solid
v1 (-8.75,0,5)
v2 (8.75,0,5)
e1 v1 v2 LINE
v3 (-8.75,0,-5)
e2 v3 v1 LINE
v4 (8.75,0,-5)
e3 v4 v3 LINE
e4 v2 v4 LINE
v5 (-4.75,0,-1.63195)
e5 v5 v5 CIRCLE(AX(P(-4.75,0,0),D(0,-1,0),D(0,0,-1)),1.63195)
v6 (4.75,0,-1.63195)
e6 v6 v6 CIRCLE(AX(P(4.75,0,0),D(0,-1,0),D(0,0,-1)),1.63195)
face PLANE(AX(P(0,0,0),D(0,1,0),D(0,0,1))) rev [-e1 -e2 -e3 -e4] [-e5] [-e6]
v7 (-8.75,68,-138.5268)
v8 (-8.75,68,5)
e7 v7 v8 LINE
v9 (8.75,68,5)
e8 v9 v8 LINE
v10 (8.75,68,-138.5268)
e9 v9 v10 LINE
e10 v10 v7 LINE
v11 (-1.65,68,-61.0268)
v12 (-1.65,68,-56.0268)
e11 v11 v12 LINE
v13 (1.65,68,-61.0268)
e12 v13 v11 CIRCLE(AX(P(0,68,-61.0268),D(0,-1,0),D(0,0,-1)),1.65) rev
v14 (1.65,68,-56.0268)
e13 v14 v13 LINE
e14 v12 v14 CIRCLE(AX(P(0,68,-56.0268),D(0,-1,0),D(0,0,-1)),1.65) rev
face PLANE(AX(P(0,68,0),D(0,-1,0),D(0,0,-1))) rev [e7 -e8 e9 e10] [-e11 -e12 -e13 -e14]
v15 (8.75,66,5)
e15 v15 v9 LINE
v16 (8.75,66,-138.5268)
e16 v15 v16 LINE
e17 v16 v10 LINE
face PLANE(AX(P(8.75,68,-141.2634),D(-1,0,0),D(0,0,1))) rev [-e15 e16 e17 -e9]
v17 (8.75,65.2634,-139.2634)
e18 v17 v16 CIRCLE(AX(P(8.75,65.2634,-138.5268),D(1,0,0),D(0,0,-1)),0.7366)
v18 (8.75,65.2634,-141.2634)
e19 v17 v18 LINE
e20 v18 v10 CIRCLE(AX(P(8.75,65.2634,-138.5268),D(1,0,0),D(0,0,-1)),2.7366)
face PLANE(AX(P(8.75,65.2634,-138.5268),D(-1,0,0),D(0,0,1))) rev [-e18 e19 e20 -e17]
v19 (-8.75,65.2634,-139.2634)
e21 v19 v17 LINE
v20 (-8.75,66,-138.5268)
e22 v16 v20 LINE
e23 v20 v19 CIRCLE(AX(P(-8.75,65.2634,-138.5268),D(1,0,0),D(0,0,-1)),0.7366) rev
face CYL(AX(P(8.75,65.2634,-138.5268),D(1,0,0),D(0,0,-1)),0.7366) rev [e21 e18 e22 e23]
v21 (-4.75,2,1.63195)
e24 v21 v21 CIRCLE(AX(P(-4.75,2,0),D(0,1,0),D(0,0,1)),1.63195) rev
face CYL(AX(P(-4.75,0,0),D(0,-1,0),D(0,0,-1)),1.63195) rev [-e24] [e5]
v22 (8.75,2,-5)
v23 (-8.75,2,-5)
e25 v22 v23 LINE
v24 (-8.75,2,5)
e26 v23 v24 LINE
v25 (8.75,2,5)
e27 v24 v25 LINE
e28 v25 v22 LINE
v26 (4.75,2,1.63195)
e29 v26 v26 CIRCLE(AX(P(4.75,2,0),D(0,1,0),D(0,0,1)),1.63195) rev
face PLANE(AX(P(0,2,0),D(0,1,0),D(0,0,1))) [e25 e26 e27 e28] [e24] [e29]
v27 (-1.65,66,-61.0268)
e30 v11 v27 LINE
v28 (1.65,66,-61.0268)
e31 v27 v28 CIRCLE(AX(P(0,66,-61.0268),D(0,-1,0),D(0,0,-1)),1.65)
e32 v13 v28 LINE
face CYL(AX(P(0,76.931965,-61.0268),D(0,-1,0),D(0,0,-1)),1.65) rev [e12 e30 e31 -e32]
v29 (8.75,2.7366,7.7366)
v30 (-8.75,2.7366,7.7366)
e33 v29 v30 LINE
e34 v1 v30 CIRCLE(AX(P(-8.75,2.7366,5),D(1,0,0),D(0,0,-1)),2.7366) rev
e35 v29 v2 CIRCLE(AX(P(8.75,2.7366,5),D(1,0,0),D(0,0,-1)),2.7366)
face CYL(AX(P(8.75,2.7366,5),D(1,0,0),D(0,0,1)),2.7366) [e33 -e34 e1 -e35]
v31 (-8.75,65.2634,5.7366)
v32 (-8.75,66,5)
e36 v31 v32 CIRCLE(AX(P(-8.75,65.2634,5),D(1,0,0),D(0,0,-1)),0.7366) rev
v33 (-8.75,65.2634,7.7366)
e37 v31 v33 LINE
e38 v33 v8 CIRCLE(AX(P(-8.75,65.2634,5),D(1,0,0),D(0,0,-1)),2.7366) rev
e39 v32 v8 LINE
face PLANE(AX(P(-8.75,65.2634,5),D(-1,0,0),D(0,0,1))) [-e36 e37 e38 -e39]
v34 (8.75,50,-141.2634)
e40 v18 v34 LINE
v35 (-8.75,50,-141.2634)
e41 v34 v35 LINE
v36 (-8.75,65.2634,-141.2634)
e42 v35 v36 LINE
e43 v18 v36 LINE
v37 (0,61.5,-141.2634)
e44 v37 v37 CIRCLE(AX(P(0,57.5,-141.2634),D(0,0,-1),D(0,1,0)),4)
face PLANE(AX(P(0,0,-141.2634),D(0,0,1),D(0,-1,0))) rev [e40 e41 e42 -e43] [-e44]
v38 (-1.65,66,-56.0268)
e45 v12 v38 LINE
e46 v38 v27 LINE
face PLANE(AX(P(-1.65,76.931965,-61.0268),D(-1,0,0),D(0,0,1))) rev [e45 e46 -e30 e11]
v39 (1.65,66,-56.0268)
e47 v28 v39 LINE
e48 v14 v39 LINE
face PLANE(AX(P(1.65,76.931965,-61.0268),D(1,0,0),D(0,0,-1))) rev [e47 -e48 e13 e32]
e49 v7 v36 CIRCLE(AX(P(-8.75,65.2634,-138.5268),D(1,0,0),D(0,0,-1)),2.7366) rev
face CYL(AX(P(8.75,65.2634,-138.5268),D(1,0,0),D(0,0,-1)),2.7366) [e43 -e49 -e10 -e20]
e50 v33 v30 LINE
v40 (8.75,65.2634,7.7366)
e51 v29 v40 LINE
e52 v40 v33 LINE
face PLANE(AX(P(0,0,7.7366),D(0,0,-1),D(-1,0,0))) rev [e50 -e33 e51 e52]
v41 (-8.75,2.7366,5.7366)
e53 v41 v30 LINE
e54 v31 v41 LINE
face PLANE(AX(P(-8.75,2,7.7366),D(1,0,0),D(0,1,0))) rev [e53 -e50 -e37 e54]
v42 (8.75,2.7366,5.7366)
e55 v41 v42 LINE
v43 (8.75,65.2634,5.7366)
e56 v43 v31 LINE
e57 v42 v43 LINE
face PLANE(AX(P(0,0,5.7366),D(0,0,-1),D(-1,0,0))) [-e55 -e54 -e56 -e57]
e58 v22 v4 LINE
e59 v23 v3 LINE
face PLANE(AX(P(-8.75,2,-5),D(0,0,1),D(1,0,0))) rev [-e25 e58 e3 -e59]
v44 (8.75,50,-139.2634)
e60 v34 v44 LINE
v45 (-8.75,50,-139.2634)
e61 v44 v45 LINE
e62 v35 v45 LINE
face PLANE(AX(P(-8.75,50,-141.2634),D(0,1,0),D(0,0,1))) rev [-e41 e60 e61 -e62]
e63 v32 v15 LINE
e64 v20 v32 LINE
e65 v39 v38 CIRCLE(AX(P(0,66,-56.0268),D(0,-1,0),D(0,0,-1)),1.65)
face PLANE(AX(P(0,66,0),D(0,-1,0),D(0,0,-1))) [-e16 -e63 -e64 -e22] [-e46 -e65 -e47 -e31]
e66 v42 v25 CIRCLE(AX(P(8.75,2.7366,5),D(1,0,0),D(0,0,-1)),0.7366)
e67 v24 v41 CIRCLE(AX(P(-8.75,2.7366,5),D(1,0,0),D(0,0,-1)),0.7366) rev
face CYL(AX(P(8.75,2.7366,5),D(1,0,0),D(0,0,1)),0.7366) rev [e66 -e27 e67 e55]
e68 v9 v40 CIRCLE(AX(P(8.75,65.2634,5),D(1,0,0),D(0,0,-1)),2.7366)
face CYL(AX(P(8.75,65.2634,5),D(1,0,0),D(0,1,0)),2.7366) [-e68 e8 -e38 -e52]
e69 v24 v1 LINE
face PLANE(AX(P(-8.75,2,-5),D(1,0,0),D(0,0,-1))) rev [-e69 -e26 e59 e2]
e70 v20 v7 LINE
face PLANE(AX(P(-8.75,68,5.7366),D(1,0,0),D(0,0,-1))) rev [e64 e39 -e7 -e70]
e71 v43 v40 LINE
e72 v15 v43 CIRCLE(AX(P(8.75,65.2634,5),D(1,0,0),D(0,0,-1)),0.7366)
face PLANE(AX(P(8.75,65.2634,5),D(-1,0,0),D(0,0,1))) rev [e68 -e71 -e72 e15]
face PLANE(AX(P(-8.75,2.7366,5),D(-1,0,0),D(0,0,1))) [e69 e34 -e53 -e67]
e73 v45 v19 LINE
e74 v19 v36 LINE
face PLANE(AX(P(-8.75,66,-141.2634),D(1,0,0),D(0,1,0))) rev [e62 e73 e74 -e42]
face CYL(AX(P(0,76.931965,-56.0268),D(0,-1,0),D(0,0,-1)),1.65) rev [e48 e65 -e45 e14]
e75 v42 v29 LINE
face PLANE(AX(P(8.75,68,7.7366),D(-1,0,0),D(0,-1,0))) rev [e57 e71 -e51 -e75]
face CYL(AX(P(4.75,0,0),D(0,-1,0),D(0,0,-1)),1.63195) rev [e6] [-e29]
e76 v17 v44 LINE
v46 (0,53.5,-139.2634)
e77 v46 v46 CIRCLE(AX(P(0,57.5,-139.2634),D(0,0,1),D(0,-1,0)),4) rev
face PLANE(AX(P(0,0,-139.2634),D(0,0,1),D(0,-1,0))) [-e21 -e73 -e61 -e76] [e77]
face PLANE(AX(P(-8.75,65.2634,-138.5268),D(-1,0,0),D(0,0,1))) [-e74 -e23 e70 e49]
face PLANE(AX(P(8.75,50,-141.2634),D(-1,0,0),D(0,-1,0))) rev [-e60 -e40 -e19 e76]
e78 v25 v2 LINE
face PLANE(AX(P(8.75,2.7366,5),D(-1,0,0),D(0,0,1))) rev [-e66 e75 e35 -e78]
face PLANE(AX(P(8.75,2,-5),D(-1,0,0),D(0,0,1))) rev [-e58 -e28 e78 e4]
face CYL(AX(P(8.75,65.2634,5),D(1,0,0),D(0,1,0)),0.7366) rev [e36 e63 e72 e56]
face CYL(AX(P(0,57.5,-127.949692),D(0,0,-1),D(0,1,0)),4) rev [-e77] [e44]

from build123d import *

# Parameters (mm, degrees)
SKETCH1_W                    = 17.5
SKETCH1_H                    = 10
BASE_FLANGE1_DEPTH           = 2
EDGE_FLANGE1_DEPTH           = 17.5
EDGE_FLANGE2_STRIP_W         = 9.4732
EDGE_FLANGE2_STRIP_H         = 2
EDGE_FLANGE2_STRIP_CUT_DEPTH = 17.5
EDGE_FLANGE2_DEPTH           = 17.5
EDGE_FLANGE3_STRIP_W         = 9.4732
EDGE_FLANGE3_STRIP_H         = 2
EDGE_FLANGE3_STRIP_CUT_DEPTH = 17.5
EDGE_FLANGE3_DEPTH           = 17.5
SKETCH18_R                   = 4
CUT_EXTRUDE2_DEPTH           = 2
F_4_CLEARANCE_HOLE1_D        = 3.2639
F_4_CLEARANCE_HOLE1_DEPTH    = 2
F_4_CLEARANCE_HOLE1_TIP      = 0.980574487
CUT_EXTRUDE3_DEPTH           = 2


# Sheet-metal steps are written as plain solids
with BuildPart() as part:
    # Sketch1 → Base-Flange1 (new body)
    with BuildSketch(Plane(origin=(0, 0, 0), x_dir=(1, 0, 0), z_dir=(0, 1, 0))):
        Rectangle(SKETCH1_W, SKETCH1_H)
    extrude(amount=BASE_FLANGE1_DEPTH)

    # Edge-Flange1 section (across the edge) → Edge-Flange1 (add)
    with BuildSketch(Plane(origin=(-8.75, 2, 5.7366), x_dir=(0, 0, -1), z_dir=(1, 0, 0))):
        with BuildLine():
            Line((-2, 0.7366), (-2, 66))
            Line((-2, 66), (0, 66))
            Line((0, 66), (0, 0.7366))
            ThreePointArc((0, 0.7366), (0.215745145, 0.215745145), (0.7366, 0))
            Line((0.7366, 0), (0.7366, -2))
            ThreePointArc((0.7366, -2), (-1.198468417, -1.198468417), (-2, 0.7366))
        make_face()
    extrude(amount=EDGE_FLANGE1_DEPTH)

    # Edge-Flange2 strip (across the edge) → Edge-Flange2 strip cut (cut)
    with BuildSketch(Plane(origin=(-8.75, 68, 5.7366), x_dir=(0, -1, 0), z_dir=(1, 0, 0))):
        with Locations((-2, -1)):
            Rectangle(EDGE_FLANGE2_STRIP_W, EDGE_FLANGE2_STRIP_H)
    extrude(amount=EDGE_FLANGE2_STRIP_CUT_DEPTH, mode=Mode.SUBTRACT)

    # Edge-Flange2 section (across the edge) → Edge-Flange2 (add)
    with BuildSketch(Plane(origin=(-8.75, 68, 5.7366), x_dir=(0, -1, 0), z_dir=(1, 0, 0))):
        with BuildLine():
            Line((0, 0.7366), (0, 147))
            Line((0, 147), (2, 147))
            Line((2, 147), (2, 0.7366))
            ThreePointArc((2, 0.7366), (2.215745145, 0.215745145), (2.7366, 0))
            Line((2.7366, 0), (2.7366, -2))
            ThreePointArc((2.7366, -2), (0.801531583, -1.198468417), (0, 0.7366))
        make_face()
    extrude(amount=EDGE_FLANGE2_DEPTH)

    # Edge-Flange3 strip (across the edge) → Edge-Flange3 strip cut (cut)
    with BuildSketch(Plane(origin=(-8.75, 66, -141.2634), x_dir=(0, 0, 1), z_dir=(1, 0, 0))):
        with Locations((-2, -1)):
            Rectangle(EDGE_FLANGE3_STRIP_W, EDGE_FLANGE3_STRIP_H)
    extrude(amount=EDGE_FLANGE3_STRIP_CUT_DEPTH, mode=Mode.SUBTRACT)

    # Edge-Flange3 section (across the edge) → Edge-Flange3 (add)
    with BuildSketch(Plane(origin=(-8.75, 66, -141.2634), x_dir=(0, 0, 1), z_dir=(1, 0, 0))):
        with BuildLine():
            Line((0, 0.7366), (0, 16))
            Line((0, 16), (2, 16))
            Line((2, 16), (2, 0.7366))
            ThreePointArc((2, 0.7366), (2.215745145, 0.215745145), (2.7366, 0))
            Line((2.7366, 0), (2.7366, -2))
            ThreePointArc((2.7366, -2), (0.801531583, -1.198468417), (0, 0.7366))
        make_face()
    extrude(amount=EDGE_FLANGE3_DEPTH)

    # Sketch18 → Cut-Extrude2 (cut)
    with BuildSketch(Plane(origin=(0, 0, -141.2634), x_dir=(-1, 0, 0), z_dir=(0, 0, -1))):
        with Locations(Location((0, 57.5, 0), (0, 0, 90))):
            Circle(SKETCH18_R)
    extrude(amount=-CUT_EXTRUDE2_DEPTH, mode=Mode.SUBTRACT)

    # #4 Clearance Hole1
    with Locations(Plane.XZ):
        with Locations((4.75, 0), (-4.75, 0)):
            Hole(F_4_CLEARANCE_HOLE1_D / 2, depth=F_4_CLEARANCE_HOLE1_DEPTH)
            with Locations((0, 0, -(F_4_CLEARANCE_HOLE1_DEPTH + F_4_CLEARANCE_HOLE1_TIP / 2))):  # 118° drill point
                Cone(0, F_4_CLEARANCE_HOLE1_D / 2, F_4_CLEARANCE_HOLE1_TIP, mode=Mode.SUBTRACT)

    # Sketch23 → Cut-Extrude3 (cut)
    with BuildSketch(Plane.XZ.offset(-66)):
        with BuildLine():
            Line((-1.65, -61.0268), (-1.65, -56.0268))
            ThreePointArc((-1.65, -56.0268), (0, -54.3768), (1.65, -56.0268))
            Line((1.65, -56.0268), (1.65, -61.0268))
            ThreePointArc((1.65, -61.0268), (0, -62.6768), (-1.65, -61.0268))
        make_face()
    extrude(amount=-CUT_EXTRUDE3_DEPTH, mode=Mode.SUBTRACT)


solid = part.part
